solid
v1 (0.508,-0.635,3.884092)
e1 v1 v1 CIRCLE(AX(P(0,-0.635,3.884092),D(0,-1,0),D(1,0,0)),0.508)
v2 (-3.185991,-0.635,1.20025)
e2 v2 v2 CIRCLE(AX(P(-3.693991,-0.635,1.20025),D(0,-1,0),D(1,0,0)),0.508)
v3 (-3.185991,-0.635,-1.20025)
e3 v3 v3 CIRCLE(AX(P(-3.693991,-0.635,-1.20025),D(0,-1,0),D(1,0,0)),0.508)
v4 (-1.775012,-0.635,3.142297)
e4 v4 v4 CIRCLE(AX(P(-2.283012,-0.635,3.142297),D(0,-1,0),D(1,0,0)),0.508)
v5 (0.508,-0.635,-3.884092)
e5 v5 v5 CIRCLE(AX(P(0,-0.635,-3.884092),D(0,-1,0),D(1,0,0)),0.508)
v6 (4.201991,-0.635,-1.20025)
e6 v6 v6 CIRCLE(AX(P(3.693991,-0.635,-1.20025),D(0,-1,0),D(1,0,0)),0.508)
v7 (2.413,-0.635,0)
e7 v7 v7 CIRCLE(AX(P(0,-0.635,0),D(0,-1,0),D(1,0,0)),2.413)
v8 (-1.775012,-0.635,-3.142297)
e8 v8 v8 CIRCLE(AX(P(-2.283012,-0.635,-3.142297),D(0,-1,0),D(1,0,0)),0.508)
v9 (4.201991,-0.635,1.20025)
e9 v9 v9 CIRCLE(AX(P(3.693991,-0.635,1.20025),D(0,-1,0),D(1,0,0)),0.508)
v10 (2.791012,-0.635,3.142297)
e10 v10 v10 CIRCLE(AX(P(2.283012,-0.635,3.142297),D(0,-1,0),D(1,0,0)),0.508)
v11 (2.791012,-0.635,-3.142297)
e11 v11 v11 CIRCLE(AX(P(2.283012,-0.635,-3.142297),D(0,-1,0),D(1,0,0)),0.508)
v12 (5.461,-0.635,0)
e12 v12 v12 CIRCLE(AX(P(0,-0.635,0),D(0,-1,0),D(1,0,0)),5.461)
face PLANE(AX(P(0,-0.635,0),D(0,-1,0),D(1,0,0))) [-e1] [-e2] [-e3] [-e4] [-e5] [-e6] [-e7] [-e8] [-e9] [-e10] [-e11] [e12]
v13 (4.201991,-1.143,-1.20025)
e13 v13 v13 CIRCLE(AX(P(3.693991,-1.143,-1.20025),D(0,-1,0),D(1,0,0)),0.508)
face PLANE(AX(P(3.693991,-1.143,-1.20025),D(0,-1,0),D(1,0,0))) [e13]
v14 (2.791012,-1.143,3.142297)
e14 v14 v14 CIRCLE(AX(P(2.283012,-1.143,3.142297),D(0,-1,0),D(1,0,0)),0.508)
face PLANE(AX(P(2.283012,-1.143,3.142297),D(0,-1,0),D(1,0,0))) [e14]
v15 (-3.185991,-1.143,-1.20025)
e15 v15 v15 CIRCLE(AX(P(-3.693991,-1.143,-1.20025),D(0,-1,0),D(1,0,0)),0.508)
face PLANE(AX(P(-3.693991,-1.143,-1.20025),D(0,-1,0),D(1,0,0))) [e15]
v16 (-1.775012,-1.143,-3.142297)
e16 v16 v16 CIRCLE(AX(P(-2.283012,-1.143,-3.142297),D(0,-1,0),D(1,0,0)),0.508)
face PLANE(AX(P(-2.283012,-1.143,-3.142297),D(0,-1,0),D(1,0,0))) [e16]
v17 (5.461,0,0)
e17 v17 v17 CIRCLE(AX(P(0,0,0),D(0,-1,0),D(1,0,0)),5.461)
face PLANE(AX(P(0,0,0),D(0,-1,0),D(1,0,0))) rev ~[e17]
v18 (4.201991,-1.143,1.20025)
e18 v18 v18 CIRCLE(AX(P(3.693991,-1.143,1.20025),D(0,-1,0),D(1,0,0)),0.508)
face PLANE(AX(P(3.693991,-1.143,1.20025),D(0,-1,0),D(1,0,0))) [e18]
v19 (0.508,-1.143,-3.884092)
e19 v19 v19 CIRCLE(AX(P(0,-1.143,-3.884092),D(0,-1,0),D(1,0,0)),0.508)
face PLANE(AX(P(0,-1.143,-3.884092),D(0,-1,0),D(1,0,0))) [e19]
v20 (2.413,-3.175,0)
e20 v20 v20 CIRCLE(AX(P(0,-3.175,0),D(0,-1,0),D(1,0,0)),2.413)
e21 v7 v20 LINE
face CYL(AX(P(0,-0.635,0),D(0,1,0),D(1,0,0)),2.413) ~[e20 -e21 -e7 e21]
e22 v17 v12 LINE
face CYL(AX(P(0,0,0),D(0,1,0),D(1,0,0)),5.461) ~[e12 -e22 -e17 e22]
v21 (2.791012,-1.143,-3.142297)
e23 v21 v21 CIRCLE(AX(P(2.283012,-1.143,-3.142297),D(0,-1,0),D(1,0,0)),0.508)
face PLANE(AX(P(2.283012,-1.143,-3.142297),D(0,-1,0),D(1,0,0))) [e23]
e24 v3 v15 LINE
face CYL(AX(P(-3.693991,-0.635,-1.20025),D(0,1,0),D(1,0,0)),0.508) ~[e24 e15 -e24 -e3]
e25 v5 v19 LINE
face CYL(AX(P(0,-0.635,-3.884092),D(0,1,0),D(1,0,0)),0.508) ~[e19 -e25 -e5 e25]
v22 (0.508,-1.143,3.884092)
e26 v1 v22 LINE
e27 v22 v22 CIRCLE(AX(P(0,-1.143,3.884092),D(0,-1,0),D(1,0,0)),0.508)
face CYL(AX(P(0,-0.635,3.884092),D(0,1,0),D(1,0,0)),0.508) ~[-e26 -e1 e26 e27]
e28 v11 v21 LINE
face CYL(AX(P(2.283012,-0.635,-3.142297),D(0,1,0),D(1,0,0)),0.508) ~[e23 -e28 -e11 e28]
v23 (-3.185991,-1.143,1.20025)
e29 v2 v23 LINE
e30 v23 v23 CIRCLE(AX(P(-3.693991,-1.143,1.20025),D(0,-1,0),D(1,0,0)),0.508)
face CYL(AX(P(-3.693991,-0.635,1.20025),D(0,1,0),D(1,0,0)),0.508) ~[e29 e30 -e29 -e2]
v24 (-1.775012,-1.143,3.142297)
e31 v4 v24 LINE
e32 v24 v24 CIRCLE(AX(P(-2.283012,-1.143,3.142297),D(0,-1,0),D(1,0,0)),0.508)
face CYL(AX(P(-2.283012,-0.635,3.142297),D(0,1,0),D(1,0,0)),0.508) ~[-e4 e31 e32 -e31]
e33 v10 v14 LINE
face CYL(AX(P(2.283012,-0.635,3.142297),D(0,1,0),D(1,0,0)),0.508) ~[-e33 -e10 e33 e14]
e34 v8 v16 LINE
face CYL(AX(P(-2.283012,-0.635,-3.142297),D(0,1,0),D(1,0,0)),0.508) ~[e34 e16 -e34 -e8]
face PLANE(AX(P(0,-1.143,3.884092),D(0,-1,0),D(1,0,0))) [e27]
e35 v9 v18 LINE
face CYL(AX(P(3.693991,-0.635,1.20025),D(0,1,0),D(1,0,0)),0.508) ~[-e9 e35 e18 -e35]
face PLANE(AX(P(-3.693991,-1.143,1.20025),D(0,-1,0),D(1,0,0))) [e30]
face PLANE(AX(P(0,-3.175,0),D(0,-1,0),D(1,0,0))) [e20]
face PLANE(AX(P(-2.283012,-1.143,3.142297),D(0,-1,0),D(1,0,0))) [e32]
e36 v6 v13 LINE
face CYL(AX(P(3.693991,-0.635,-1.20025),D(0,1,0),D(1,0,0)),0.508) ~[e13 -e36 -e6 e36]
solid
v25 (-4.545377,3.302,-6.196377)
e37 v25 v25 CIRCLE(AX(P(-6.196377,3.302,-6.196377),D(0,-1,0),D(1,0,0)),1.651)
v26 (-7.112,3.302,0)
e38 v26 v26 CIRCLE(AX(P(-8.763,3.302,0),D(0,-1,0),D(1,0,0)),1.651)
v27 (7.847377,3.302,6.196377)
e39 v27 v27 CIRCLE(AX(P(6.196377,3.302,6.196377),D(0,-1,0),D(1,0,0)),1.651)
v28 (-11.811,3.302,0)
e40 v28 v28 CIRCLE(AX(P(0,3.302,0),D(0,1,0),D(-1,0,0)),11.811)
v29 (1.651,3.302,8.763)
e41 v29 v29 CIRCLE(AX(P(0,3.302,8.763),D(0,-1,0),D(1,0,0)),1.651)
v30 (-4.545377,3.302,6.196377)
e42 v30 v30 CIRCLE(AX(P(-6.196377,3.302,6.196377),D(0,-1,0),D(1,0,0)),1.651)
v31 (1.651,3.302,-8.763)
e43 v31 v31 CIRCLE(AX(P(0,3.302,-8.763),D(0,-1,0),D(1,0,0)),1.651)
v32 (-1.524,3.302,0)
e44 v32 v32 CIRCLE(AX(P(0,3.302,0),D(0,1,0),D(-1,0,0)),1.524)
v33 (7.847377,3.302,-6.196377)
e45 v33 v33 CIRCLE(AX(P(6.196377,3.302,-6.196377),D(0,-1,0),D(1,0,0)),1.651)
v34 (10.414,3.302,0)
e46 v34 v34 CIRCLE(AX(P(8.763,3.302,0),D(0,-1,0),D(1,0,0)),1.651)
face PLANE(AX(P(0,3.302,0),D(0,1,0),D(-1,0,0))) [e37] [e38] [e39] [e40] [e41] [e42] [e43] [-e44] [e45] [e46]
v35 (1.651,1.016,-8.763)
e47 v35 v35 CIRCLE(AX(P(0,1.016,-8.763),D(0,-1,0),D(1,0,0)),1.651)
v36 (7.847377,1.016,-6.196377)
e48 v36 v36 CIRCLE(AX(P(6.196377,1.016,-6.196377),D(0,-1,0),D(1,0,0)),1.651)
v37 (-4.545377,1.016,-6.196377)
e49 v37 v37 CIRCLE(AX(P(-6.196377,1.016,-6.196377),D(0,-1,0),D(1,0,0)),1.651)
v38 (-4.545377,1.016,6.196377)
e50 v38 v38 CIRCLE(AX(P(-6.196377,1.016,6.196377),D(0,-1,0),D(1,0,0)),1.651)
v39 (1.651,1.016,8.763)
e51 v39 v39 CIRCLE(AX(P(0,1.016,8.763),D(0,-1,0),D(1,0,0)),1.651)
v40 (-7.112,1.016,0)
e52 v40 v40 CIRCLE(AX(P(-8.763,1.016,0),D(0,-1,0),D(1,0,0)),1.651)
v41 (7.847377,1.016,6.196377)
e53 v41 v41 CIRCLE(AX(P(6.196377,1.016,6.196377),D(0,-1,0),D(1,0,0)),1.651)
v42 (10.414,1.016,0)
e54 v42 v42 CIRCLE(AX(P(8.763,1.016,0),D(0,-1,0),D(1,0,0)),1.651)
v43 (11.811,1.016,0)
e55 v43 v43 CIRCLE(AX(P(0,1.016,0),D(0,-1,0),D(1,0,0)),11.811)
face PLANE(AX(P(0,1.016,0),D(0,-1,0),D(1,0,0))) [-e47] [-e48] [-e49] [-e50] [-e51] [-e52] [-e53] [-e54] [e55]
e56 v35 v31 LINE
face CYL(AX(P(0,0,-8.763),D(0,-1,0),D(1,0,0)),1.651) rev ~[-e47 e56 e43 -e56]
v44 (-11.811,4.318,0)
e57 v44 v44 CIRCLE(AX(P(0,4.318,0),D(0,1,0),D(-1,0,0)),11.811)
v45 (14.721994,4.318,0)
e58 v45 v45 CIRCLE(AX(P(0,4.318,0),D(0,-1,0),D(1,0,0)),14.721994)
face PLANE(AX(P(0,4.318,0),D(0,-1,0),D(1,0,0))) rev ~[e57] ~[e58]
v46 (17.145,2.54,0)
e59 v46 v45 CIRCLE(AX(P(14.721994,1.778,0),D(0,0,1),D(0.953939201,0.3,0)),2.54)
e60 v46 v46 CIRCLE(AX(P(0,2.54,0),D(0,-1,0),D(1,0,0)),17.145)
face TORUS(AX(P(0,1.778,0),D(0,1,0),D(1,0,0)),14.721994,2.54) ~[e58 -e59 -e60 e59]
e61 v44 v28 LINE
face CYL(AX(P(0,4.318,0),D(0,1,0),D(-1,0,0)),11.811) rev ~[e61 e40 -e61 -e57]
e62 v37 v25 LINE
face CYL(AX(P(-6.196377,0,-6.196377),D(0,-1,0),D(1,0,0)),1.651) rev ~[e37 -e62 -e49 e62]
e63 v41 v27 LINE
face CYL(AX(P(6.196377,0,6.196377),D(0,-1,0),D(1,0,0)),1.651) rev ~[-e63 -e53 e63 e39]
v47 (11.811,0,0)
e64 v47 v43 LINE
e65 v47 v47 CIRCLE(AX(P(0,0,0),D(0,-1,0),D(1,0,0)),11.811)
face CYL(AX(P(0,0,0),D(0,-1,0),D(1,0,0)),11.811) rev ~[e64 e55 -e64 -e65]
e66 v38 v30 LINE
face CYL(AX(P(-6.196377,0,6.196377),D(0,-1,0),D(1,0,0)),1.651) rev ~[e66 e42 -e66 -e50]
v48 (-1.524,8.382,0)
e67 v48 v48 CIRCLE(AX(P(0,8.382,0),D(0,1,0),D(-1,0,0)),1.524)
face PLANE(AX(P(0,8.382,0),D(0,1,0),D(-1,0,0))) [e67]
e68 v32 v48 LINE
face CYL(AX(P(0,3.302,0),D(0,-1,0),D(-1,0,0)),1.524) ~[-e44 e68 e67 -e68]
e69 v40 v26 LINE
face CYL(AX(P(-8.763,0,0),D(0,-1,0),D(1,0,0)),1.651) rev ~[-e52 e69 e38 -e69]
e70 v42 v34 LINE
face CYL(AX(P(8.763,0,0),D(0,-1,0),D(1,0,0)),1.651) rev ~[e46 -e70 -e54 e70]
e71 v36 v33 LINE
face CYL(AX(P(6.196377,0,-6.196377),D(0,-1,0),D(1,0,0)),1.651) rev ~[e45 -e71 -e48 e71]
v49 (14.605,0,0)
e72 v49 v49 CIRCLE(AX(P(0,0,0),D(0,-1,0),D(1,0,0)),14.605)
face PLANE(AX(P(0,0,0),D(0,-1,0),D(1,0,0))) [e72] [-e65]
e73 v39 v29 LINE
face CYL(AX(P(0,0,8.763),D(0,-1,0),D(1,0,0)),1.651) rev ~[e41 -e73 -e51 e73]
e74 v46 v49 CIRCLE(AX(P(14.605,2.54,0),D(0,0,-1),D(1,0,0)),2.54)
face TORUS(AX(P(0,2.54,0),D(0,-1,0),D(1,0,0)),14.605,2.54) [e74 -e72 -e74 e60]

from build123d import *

# Parameters (mm, degrees)
F0_R      = 17.145
F1_DEPTH  = 4.318
F2_R      = 2.54
F4_R      = 5.461
F5_DEPTH  = 0.635
F6_R      = 2.413
F7_DEPTH  = 2.54
F9_R      = 1.651
F10_DEPTH = 25.4
F11_R     = 0.508
F12_DEPTH = 0.508
F8_R      = 11.811
F13_DEPTH = 1.016
F14_R     = 11.811
F15_DEPTH = 1.016
F16_R     = 1.524
F17_DEPTH = 5.08


# Not quite as in the source:
# - a fillet or chamfer that OpenCascade refuses, or shapes differently, is made with other operations: its cross-section is extruded or revolved along the edge and cut away or added


with BuildPart() as f1:
    # F0 (on Front) → F1 (new body)
    with BuildSketch(Plane.XZ):
        Circle(F0_R)
    extrude(amount=-F1_DEPTH)

    # F2
    f2_edges = [f1.edges().sort_by_distance(p)[0] for p in [
        (-17.145, 0, 0),
    ]]
    fillet(f2_edges, radius=F2_R)

    # F3: fillet of radius 2.54 on 1 edges, made by hand

    # F3_s1 → F3_t2 (revolve, cut)
    with BuildSketch(Plane.XY):
        with BuildLine():
            ThreePointArc((17.145, 2.54), (16.2246786933, 3.8258134681), (14.7219944284, 4.318))
            Line((14.7219944284, 4.318), (17.145, 4.318))
            Line((17.145, 4.318), (17.145, 2.54))
        make_face()
    revolve(axis=Axis((0, 4.318, 0), (0, -1, 0)), mode=Mode.SUBTRACT)

    # F9 (on face) → F10 (cut)
    with BuildSketch(Plane.XZ):
        with Locations((0, -8.7630003691)):
            Circle(F9_R)
        with Locations((6.1963769845, -6.1963769845)):
            Circle(F9_R)
        with Locations((8.7630003691, 0)):
            Circle(F9_R)
        with Locations((6.1963769845, 6.1963769845)):
            Circle(F9_R)
        with Locations((-8.7630003691, 0)):
            Circle(F9_R)
        with Locations((0, 8.7630003691)):
            Circle(F9_R)
        with Locations((-6.1963769845, 6.1963769845)):
            Circle(F9_R)
        with Locations((-6.1963769845, -6.1963769845)):
            Circle(F9_R)
    extrude(amount=-F10_DEPTH, mode=Mode.SUBTRACT)

    # F8 (on face) → F13 (cut)
    with BuildSketch(Plane.XZ):
        Circle(F8_R)
    extrude(amount=-F13_DEPTH, mode=Mode.SUBTRACT)

    # F14 (on face) → F15 (cut)
    with BuildSketch(Plane(origin=(0, 4.318, 0), x_dir=(-1, 0, 0), z_dir=(0, 1, 0))):
        Circle(F14_R)
    extrude(amount=-F15_DEPTH, mode=Mode.SUBTRACT)

    # F16 (on face) → F17 (join)
    with BuildSketch(Plane(origin=(0, 3.302, 0), x_dir=(-1, 0, 0), z_dir=(0, 1, 0))):
        Circle(F16_R)
    extrude(amount=F17_DEPTH)


with BuildPart() as f5:
    # F4 (on face) → F5 (new body)
    with BuildSketch(Plane.XZ):
        Circle(F4_R)
    extrude(amount=F5_DEPTH)

    # F6 (on face) → F7 (join)
    with BuildSketch(Plane.XZ.offset(0.635)):
        Circle(F6_R)
    extrude(amount=F7_DEPTH)

    # F11 (on face) → F12 (join)
    with BuildSketch(Plane.XZ.offset(0.635)):
        with Locations((0, 3.8840922061)):
            Circle(F11_R)
        with Locations((-2.2830121173, 3.1422966025)):
            Circle(F11_R)
        with Locations((-3.6939912025, 1.2002504994)):
            Circle(F11_R)
        with Locations((-3.6939912025, -1.2002504994)):
            Circle(F11_R)
        with Locations((-2.2830121173, -3.1422966025)):
            Circle(F11_R)
        with Locations((0, -3.8840922061)):
            Circle(F11_R)
        with Locations((2.2830121173, 3.1422966025)):
            Circle(F11_R)
        with Locations((3.6939912025, 1.2002504994)):
            Circle(F11_R)
        with Locations((3.6939912025, -1.2002504994)):
            Circle(F11_R)
        with Locations((2.2830121173, -3.1422966025)):
            Circle(F11_R)
    extrude(amount=F12_DEPTH)


solid = Compound([f1.part, f5.part])
